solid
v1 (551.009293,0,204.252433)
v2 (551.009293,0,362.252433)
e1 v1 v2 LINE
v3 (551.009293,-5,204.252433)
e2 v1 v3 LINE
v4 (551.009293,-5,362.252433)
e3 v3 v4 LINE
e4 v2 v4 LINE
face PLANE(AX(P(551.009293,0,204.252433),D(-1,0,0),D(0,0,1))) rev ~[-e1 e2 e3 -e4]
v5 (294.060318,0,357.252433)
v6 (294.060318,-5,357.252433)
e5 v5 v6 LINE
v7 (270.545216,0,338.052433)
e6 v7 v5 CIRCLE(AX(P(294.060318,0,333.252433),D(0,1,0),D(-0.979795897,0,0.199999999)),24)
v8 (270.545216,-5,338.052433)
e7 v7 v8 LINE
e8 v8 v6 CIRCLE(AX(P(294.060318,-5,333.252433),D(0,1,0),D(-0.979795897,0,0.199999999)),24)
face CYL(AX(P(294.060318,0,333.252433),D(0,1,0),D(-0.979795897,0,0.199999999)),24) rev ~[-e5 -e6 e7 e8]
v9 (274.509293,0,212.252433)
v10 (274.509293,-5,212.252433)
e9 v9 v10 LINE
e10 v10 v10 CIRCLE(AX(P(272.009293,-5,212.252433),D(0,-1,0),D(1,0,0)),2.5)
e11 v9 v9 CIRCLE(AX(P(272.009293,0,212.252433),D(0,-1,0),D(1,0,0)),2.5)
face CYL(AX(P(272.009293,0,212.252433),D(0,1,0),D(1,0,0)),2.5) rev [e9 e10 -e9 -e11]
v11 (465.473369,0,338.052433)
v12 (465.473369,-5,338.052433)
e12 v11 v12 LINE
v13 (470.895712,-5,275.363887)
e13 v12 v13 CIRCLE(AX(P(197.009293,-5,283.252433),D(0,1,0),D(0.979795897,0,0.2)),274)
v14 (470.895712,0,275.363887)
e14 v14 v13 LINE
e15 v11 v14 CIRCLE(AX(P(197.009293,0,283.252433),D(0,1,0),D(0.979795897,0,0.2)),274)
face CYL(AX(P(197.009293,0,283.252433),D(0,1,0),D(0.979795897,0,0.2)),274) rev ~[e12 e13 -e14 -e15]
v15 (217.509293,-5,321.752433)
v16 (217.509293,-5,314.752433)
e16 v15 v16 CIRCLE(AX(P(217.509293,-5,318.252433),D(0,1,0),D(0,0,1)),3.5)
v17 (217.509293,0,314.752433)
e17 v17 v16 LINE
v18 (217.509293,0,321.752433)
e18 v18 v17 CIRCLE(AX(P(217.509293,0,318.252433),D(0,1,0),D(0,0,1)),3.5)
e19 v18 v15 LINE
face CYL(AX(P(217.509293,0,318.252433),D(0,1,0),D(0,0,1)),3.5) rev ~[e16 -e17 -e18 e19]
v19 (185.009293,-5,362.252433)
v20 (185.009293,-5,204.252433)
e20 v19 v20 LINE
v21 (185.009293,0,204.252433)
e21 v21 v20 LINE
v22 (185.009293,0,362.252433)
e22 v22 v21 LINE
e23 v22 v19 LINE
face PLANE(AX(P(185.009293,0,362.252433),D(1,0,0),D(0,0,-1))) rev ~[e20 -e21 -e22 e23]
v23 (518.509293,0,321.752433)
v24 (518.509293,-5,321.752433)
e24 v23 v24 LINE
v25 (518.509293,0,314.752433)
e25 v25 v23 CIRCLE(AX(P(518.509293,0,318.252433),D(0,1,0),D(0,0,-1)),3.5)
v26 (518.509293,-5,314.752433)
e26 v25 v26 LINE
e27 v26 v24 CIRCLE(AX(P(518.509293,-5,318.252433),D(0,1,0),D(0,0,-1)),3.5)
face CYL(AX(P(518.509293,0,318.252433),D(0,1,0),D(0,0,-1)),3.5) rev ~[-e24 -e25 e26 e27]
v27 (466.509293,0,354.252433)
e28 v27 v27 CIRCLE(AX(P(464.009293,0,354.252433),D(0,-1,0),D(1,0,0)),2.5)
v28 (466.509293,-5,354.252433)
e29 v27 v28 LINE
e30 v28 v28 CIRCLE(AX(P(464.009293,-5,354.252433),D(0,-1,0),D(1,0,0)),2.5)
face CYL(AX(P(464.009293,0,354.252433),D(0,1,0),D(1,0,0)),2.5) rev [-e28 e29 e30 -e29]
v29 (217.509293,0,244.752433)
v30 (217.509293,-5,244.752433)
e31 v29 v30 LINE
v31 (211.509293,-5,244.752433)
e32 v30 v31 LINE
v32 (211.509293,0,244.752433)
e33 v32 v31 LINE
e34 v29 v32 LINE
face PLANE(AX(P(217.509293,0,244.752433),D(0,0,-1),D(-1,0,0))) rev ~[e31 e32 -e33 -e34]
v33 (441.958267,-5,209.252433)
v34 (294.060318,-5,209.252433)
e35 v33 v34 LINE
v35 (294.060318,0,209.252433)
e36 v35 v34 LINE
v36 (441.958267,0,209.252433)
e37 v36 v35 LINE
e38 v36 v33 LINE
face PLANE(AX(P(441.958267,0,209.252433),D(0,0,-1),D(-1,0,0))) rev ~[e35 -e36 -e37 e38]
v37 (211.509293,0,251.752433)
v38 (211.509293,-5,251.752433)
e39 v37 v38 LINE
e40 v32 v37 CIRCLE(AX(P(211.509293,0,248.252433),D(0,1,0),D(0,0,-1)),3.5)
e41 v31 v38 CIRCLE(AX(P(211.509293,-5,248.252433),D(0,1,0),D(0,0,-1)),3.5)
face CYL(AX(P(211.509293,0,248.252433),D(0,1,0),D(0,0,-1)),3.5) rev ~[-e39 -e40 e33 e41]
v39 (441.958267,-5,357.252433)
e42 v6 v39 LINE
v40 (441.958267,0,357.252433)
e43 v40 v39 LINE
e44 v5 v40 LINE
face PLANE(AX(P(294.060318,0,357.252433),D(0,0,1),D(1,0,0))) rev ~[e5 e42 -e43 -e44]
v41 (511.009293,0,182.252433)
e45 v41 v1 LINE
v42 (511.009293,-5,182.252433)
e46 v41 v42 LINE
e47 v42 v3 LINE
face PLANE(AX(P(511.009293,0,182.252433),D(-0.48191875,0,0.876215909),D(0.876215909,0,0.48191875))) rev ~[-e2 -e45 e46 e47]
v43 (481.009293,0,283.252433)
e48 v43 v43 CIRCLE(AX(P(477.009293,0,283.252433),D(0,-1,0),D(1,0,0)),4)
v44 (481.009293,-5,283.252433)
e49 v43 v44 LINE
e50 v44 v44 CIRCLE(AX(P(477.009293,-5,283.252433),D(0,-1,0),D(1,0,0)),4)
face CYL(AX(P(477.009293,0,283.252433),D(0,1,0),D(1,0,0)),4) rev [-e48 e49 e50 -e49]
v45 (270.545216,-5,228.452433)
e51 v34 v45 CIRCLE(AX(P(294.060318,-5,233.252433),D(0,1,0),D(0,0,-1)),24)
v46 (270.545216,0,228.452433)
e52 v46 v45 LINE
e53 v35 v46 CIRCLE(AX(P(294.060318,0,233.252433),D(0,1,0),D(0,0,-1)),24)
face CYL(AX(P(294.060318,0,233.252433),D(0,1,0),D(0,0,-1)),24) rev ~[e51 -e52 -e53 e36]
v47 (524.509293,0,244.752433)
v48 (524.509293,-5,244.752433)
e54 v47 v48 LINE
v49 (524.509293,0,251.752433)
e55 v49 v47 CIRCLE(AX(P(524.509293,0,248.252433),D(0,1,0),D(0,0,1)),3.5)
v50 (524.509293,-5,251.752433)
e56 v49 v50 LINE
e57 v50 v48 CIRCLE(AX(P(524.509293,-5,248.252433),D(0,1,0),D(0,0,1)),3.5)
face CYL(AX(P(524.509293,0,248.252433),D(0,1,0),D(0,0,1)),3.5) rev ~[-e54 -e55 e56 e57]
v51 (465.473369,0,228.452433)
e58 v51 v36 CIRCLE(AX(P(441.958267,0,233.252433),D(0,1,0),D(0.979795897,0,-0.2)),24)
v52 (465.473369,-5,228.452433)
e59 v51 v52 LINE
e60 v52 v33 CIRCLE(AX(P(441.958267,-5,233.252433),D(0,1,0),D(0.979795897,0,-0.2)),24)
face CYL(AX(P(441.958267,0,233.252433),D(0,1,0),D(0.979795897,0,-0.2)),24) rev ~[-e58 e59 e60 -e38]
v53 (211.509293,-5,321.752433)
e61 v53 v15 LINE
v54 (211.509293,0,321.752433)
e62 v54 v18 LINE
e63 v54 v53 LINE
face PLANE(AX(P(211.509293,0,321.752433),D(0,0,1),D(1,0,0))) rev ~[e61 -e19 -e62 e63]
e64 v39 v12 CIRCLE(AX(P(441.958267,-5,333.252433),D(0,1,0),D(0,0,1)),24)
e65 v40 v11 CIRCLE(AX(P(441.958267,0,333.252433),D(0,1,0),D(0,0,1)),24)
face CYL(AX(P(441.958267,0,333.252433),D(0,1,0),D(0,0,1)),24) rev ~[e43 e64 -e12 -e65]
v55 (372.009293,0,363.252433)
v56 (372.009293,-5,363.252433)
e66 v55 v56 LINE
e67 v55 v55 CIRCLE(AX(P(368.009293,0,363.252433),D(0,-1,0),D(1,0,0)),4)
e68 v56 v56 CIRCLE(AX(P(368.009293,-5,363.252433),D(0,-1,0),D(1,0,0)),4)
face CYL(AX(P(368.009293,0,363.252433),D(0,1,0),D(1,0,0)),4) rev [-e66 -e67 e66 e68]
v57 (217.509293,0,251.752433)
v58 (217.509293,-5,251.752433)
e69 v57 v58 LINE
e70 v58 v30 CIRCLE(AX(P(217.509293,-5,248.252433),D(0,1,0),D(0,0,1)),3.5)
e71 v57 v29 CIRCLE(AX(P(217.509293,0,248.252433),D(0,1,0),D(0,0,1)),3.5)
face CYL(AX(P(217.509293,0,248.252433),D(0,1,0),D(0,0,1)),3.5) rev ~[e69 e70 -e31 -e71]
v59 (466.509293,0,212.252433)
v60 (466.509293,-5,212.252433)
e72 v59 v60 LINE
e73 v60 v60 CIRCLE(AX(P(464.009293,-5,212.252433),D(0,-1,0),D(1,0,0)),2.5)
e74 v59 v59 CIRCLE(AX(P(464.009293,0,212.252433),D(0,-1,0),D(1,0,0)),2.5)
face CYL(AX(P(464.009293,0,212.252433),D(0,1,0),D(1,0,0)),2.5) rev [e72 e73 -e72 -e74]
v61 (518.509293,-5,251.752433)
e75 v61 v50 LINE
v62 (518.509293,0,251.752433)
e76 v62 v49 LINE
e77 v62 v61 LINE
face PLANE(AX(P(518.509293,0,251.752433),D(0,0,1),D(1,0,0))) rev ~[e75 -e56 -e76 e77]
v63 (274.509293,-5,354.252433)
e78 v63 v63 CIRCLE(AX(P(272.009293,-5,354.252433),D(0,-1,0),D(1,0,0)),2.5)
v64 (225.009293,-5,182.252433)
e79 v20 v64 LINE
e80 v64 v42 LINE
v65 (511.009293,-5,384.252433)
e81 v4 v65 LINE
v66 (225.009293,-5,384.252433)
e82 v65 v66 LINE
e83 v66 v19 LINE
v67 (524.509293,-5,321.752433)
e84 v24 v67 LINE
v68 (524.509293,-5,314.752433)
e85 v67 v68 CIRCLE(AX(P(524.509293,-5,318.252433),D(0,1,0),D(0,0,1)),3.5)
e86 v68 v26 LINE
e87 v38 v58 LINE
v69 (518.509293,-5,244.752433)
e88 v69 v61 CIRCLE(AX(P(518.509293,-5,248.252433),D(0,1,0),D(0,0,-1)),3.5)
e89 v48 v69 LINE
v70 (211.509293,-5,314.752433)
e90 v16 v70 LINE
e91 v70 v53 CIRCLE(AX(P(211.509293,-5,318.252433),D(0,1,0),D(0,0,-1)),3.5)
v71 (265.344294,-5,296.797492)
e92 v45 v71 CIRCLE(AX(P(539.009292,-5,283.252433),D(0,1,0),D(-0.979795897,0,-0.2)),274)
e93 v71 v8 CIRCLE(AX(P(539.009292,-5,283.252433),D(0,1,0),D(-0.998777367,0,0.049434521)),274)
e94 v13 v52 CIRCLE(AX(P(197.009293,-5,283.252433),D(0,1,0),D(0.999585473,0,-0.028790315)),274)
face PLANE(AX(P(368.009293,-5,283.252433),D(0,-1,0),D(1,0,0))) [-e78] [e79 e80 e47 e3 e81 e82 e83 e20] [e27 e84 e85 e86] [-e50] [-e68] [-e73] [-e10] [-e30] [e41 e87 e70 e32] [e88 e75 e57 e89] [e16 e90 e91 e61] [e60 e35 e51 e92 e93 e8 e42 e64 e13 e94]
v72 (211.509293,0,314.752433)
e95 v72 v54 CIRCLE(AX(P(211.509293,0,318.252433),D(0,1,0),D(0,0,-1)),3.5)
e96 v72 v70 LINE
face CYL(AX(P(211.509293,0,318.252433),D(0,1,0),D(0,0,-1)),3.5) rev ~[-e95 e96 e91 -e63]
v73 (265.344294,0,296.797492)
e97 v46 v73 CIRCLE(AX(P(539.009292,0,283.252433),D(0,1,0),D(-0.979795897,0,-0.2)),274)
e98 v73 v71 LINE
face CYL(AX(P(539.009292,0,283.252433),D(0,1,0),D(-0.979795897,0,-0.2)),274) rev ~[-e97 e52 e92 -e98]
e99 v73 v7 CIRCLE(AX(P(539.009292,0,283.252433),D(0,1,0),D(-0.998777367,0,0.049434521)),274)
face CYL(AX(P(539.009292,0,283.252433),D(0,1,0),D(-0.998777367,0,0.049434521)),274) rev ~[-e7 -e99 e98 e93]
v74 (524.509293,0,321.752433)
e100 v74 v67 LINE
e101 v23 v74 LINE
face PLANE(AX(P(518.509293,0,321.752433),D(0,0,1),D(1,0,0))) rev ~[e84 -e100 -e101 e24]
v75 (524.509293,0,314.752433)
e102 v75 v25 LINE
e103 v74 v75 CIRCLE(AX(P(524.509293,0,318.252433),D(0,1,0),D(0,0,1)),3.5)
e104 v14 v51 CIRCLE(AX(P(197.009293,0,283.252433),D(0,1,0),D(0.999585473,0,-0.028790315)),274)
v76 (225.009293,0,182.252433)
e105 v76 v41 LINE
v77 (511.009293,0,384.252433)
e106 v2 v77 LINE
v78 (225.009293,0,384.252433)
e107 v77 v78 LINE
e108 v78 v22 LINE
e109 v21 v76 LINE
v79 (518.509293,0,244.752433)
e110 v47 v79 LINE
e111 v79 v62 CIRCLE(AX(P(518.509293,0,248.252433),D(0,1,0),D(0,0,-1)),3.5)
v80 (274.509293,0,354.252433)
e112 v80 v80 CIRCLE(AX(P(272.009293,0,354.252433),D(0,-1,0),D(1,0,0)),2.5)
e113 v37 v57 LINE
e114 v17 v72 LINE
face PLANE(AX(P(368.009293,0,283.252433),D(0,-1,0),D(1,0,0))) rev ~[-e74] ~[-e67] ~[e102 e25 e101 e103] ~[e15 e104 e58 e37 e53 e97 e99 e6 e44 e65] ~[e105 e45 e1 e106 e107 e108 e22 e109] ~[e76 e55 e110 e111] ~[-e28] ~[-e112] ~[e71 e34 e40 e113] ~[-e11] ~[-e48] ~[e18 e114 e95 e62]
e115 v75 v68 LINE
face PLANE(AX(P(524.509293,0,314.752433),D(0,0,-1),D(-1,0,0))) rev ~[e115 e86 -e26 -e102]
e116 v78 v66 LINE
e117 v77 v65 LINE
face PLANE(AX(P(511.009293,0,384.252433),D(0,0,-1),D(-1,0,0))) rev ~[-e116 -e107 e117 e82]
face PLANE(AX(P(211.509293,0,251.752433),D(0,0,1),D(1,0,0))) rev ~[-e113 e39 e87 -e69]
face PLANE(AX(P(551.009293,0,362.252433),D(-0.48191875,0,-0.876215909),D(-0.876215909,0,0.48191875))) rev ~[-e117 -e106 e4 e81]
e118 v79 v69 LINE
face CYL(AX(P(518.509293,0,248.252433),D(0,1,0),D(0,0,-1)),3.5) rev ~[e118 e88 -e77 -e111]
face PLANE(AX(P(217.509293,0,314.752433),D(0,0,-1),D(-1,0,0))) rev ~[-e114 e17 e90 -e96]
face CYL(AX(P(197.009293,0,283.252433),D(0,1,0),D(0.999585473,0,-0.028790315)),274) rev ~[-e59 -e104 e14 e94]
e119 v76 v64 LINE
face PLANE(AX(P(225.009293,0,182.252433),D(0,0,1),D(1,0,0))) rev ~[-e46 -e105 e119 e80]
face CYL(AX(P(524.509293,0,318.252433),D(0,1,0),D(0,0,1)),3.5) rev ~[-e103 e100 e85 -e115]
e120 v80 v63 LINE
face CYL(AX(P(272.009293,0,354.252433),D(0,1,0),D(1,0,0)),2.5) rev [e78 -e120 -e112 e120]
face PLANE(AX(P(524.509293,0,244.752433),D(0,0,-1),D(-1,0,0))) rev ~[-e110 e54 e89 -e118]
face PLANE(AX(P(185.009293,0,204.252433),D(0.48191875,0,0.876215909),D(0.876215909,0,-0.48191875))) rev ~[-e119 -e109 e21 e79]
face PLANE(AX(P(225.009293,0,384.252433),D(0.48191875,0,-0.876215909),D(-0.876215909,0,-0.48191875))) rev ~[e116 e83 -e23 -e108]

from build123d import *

# Parameters (mm, degrees)
F0_R     = 2.5
F0_R_2   = 4
F1_DEPTH = 5


with BuildPart() as f1:
    # F0 (on Front) → F1 (new body)
    with BuildSketch(Plane.XZ):
        Polygon((185.009293, 204.252433), (225.009293, 182.252433), (368.009293, 182.252433), (511.009293, 182.252433), (551.009293, 204.252433), (551.009293, 362.252433), (511.009293, 384.252433), (389.4801139832, 384.252433), (225.009293, 384.252433), (185.009293, 362.252433), align=None)
        with BuildLine():
            Line((211.509293, 251.752433), (217.509293, 251.752433))
            ThreePointArc((217.509293, 251.752433), (221.009293, 248.252433), (217.509293, 244.752433))
            Line((217.509293, 244.752433), (211.509293, 244.752433))
            ThreePointArc((211.509293, 244.752433), (208.009293, 248.252433), (211.509293, 251.752433))
        make_face(mode=Mode.SUBTRACT)
        with Locations((272.009293, 212.252433)):
            Circle(F0_R, mode=Mode.SUBTRACT)
        with BuildLine():
            ThreePointArc((270.5452164665, 338.0524329864), (278.8813852258, 351.8427530574), (294.060318, 357.252433))
            Line((294.060318, 357.252433), (388.009293, 357.252433))
            Line((388.009293, 357.252433), (441.958267, 357.252433))
            ThreePointArc((441.958267, 357.252433), (457.1371997667, 351.8427530635), (465.4733685296, 338.0524330052))
            ThreePointArc((465.4733685296, 338.0524330052), (469.9900217644, 306.8643277742), (470.8957123265, 275.3638866829))
            ThreePointArc((470.8957123265, 275.3638866829), (469.1970699877, 251.7911247549), (465.4733685296, 228.4524328857))
            ThreePointArc((465.4733685296, 228.4524328857), (457.1371997667, 214.6621128274), (441.958267, 209.2524328909))
            Line((441.958267, 209.2524328909), (368.0092925, 209.2524328909))
            Line((368.0092925, 209.2524328909), (294.060318, 209.2524328909))
            ThreePointArc((294.060318, 209.2524328909), (278.8813852287, 214.6621128311), (270.545216468, 228.4524328972))
            ThreePointArc((270.545216468, 228.4524328972), (265.7992173248, 262.4616912169), (265.3442938418, 296.797491833))
            ThreePointArc((265.3442938418, 296.797491833), (267.1610334487, 317.523764537), (270.5452164665, 338.0524329864))
        make_face(mode=Mode.SUBTRACT)
        with BuildLine():
            ThreePointArc((211.509293, 314.752433), (208.009293, 318.252433), (211.509293, 321.752433))
            Line((211.509293, 321.752433), (217.509293, 321.752433))
            ThreePointArc((217.509293, 321.752433), (221.009293, 318.252433), (217.509293, 314.752433))
            Line((217.509293, 314.752433), (211.509293, 314.752433))
        make_face(mode=Mode.SUBTRACT)
        with Locations((272.009293, 354.252433)):
            Circle(F0_R, mode=Mode.SUBTRACT)
        with Locations((368.009293, 363.252433)):
            Circle(F0_R_2, mode=Mode.SUBTRACT)
        with Locations((464.009293, 212.252433)):
            Circle(F0_R, mode=Mode.SUBTRACT)
        with BuildLine():
            Line((518.509293, 251.752433), (524.509293, 251.752433))
            ThreePointArc((524.509293, 251.752433), (528.009293, 248.252433), (524.509293, 244.752433))
            Line((524.509293, 244.752433), (518.509293, 244.752433))
            ThreePointArc((518.509293, 244.752433), (515.009293, 248.252433), (518.509293, 251.752433))
        make_face(mode=Mode.SUBTRACT)
        with Locations((477.009293, 283.252433)):
            Circle(F0_R_2, mode=Mode.SUBTRACT)
        with BuildLine():
            Line((524.509293, 314.752433), (518.509293, 314.752433))
            ThreePointArc((518.509293, 314.752433), (515.009293, 318.252433), (518.509293, 321.752433))
            Line((518.509293, 321.752433), (524.509293, 321.752433))
            ThreePointArc((524.509293, 321.752433), (528.009293, 318.252433), (524.509293, 314.752433))
        make_face(mode=Mode.SUBTRACT)
        with Locations((464.009293, 354.252433)):
            Circle(F0_R, mode=Mode.SUBTRACT)
    extrude(amount=F1_DEPTH)


solid = f1.part
